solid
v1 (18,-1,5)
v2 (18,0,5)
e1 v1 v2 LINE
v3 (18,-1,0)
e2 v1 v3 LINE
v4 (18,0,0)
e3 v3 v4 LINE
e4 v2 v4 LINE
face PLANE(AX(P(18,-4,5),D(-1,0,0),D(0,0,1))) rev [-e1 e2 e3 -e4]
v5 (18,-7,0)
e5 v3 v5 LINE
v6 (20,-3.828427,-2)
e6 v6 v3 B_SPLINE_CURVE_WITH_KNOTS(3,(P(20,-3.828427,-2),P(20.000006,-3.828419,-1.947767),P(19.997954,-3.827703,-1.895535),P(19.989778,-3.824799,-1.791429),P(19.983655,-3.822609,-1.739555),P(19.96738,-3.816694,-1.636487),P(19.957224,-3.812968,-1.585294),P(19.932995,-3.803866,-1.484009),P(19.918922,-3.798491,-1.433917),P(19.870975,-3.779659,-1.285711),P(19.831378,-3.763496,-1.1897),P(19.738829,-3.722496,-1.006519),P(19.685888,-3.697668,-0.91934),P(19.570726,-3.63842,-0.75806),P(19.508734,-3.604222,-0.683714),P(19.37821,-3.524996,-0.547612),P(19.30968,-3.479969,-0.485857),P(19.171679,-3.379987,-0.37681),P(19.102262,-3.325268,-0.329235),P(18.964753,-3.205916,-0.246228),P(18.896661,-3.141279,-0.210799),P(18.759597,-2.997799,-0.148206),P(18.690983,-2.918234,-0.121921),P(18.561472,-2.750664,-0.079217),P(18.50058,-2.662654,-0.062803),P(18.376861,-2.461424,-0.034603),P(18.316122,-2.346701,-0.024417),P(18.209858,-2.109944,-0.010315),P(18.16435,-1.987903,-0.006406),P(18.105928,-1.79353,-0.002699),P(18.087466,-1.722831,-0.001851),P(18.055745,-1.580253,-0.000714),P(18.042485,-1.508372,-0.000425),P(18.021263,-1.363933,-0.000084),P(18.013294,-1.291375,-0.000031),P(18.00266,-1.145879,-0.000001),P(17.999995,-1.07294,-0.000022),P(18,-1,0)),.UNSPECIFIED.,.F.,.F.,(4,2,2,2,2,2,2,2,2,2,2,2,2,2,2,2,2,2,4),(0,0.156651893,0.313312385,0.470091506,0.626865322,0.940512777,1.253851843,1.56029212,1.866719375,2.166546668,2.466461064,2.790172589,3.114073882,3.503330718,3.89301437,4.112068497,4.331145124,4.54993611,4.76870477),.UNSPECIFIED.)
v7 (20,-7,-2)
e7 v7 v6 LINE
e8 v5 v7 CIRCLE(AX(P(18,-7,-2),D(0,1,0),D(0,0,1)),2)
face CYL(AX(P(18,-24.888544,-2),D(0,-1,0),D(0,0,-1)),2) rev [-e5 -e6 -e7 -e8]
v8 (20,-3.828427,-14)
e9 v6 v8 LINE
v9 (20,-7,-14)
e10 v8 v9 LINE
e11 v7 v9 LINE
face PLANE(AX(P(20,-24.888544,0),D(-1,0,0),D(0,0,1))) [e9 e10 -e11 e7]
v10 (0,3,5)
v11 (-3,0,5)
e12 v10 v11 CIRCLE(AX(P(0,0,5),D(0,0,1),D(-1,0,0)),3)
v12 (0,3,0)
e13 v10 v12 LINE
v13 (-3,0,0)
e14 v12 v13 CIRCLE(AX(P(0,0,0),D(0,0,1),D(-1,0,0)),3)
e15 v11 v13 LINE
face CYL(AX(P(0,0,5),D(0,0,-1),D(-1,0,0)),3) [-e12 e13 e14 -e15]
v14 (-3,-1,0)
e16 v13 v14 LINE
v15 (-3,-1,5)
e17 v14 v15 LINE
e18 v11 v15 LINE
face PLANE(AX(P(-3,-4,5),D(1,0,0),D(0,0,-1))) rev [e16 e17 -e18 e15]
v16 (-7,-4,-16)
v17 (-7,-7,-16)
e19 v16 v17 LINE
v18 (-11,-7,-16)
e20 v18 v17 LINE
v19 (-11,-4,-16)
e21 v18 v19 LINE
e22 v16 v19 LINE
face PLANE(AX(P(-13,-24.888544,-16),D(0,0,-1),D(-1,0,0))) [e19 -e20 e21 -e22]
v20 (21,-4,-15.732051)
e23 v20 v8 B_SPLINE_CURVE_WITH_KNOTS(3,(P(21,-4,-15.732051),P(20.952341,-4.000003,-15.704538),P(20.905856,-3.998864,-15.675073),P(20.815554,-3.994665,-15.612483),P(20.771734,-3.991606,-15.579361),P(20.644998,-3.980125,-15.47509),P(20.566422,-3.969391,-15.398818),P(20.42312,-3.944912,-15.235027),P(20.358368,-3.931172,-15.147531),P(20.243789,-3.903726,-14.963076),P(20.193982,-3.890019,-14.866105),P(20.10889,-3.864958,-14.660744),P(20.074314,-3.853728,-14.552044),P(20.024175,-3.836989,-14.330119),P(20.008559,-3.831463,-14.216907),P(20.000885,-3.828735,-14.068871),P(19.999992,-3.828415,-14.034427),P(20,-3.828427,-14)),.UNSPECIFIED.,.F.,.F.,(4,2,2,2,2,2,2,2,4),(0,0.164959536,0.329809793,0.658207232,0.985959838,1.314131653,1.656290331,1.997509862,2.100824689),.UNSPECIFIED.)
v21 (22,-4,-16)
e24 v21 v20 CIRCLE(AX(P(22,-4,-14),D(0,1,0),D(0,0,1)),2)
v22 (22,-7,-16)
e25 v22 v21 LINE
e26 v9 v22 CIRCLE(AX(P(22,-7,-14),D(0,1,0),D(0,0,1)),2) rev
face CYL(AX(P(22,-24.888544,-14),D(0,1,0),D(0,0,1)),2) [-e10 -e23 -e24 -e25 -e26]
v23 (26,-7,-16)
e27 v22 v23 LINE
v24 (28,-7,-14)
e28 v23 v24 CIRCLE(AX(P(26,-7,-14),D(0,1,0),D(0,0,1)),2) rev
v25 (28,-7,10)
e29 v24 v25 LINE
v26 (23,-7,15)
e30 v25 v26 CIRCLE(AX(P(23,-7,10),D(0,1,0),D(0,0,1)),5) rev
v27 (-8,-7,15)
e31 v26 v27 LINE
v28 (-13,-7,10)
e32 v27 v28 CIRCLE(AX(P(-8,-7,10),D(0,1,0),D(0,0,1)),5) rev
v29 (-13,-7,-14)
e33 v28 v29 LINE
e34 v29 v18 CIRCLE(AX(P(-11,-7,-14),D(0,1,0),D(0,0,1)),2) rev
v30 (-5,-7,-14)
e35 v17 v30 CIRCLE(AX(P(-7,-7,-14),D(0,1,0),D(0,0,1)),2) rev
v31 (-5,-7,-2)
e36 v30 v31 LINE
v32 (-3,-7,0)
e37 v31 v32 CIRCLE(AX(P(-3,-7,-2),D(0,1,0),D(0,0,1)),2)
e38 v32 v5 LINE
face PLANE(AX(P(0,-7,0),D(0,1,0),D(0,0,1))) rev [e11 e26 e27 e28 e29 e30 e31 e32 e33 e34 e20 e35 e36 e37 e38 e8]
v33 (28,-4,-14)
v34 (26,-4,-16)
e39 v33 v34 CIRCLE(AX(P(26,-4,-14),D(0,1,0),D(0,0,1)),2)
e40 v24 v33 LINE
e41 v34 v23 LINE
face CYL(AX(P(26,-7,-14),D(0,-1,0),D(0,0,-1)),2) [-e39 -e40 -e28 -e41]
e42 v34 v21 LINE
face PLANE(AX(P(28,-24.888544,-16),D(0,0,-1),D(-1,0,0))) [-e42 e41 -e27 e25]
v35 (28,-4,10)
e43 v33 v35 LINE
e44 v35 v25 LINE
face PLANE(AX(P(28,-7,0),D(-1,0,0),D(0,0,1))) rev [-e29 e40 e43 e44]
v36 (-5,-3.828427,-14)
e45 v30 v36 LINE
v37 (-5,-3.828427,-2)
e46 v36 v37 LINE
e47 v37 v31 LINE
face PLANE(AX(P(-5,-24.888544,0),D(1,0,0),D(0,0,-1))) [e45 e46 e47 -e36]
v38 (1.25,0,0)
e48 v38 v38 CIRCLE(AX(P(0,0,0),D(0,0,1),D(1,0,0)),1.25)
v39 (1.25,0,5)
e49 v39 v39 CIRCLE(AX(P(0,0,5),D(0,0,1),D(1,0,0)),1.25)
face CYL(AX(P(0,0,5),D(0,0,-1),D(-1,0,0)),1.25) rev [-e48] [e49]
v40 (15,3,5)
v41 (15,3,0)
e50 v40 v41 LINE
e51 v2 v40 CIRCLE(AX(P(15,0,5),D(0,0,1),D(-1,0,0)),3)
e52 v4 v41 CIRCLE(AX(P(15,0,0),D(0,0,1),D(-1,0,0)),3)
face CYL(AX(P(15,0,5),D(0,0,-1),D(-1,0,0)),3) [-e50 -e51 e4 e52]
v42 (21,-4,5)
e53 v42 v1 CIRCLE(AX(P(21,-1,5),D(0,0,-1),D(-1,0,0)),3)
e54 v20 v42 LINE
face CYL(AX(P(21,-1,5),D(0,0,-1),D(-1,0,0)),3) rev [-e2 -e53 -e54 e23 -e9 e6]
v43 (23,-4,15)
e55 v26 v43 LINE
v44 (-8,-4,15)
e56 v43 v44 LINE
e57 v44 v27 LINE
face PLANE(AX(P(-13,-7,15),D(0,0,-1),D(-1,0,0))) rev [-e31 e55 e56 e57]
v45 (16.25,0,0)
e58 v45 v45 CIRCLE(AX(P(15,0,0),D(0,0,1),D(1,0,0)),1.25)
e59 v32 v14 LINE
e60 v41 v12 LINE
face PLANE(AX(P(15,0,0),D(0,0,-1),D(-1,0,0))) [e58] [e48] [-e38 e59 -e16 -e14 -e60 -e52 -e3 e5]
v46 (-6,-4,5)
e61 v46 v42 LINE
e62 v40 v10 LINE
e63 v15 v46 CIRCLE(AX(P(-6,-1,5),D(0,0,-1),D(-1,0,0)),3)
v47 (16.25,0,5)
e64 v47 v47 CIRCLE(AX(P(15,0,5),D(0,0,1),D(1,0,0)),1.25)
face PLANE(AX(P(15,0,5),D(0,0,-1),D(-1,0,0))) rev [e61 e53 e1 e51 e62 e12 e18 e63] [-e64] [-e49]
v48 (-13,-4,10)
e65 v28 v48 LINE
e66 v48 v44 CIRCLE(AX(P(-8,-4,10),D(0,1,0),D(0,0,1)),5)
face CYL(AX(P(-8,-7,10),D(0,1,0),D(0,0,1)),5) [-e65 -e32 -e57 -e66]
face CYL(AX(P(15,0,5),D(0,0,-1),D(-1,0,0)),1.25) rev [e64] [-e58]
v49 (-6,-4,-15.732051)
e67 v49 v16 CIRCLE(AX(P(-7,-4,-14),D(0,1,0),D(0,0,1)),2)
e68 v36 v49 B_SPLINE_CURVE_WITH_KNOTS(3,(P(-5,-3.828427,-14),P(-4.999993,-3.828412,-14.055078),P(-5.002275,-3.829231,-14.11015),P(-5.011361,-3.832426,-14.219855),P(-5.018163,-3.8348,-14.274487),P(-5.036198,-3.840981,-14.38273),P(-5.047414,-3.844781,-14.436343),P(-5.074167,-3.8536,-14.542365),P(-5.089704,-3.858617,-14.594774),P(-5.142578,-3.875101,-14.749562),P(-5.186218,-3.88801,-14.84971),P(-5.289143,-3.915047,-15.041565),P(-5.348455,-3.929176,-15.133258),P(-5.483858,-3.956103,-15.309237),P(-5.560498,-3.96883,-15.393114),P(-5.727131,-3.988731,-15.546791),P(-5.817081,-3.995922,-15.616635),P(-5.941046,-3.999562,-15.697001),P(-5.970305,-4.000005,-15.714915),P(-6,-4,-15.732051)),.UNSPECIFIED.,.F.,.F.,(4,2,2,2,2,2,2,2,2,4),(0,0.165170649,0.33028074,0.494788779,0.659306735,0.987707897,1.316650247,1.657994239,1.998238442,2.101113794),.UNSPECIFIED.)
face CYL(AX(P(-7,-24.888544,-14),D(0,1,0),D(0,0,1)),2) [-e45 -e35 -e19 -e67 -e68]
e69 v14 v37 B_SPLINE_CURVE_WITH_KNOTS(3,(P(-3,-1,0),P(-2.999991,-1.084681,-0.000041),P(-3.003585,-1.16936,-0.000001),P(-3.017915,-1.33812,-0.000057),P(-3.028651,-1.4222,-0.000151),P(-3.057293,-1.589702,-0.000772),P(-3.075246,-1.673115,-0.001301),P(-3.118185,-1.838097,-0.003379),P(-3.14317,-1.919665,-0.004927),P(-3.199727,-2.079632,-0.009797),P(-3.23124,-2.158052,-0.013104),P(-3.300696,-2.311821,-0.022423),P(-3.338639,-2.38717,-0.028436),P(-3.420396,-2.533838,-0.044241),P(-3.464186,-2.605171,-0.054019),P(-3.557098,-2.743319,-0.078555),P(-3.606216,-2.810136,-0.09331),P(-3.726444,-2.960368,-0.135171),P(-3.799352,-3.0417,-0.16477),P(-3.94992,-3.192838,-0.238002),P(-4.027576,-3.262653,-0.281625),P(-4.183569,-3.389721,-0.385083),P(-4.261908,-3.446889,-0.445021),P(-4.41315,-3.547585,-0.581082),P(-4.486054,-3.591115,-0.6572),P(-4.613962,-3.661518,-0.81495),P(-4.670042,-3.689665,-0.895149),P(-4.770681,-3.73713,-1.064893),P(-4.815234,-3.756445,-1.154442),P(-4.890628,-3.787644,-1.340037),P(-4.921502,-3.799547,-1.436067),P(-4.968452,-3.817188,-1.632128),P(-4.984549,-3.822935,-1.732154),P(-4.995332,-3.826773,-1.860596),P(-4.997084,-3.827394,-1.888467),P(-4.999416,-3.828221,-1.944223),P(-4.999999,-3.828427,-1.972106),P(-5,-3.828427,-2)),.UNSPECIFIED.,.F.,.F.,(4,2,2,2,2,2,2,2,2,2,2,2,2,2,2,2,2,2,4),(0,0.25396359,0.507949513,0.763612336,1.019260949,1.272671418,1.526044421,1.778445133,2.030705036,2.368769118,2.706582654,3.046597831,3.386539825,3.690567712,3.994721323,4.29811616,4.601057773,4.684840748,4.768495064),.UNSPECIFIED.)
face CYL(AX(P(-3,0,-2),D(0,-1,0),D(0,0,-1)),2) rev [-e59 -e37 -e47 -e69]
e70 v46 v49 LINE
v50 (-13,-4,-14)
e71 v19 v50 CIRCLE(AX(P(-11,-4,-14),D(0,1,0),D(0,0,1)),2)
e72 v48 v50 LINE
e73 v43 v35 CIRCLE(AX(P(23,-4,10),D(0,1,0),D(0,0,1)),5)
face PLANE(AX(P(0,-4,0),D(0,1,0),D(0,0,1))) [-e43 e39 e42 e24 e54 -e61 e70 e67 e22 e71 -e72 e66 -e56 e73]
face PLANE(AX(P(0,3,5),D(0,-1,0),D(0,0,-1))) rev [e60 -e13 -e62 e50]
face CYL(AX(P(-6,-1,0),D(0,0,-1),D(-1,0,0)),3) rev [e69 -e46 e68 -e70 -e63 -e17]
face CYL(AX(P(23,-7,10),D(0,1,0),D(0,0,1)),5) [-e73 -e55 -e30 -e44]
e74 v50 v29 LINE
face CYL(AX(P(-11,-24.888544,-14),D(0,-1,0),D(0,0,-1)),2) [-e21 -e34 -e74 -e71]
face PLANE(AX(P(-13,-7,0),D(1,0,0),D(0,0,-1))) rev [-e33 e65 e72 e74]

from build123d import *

# Parameters (mm, degrees)
SKETCH_1_R      = 1.25
EXTRUDE_1_DEPTH = 5
SKETCH_2_W      = 41
SKETCH_2_H      = 15
EXTRUDE_2_DEPTH = 3
SKETCH_4_W      = 8
SKETCH_4_H      = 16
EXTRUDE_3_DEPTH = 3
FILLET_1_R      = 3
FILLET_2_R      = 5
FILLET_3_R      = 2


with BuildPart() as part:
    # ｽｹｯﾁ1 → ﾎﾞｽ - 押し出し1 (new body)
    with BuildSketch(Plane.XY):
        with BuildLine():
            Line((-3, -4), (18, -4))
            Line((18, -4), (18, 0))
            ThreePointArc((18, 0), (17.121320344, 2.121320344), (15, 3))
            Line((15, 3), (0, 3))
            ThreePointArc((0, 3), (-2.121320344, 2.121320344), (-3, 0))
            Line((-3, 0), (-3, -4))
        make_face()
        Circle(SKETCH_1_R, mode=Mode.SUBTRACT)
        with Locations((15, 0)):
            Circle(SKETCH_1_R, mode=Mode.SUBTRACT)
    extrude(amount=EXTRUDE_1_DEPTH)

    # ｽｹｯﾁ2 → ﾎﾞｽ - 押し出し2 (add)
    with BuildSketch(Plane.XZ.offset(4)):
        with Locations((7.5, 7.5)):
            Rectangle(SKETCH_2_W, SKETCH_2_H)
    extrude(amount=EXTRUDE_2_DEPTH)

    # ｽｹｯﾁ4 → ﾎﾞｽ - 押し出し3 (add)
    with BuildSketch(Plane(origin=(0, -4, 0), x_dir=(1, 0, 0), z_dir=(0, 1, 0))):
        with Locations((-9, 8)):
            Rectangle(SKETCH_4_W, SKETCH_4_H)
        with Locations((24, 8)):
            Rectangle(SKETCH_4_W, SKETCH_4_H)
    extrude(amount=-EXTRUDE_3_DEPTH)

    # ﾌｨﾚｯﾄ1
    fillet_1_edges = [part.edges().sort_by_distance(p)[0] for p in [
        (-3, -4, 2.5),
        (18, -4, 2.5),
    ]]
    fillet(fillet_1_edges, radius=FILLET_1_R)

    # ﾌｨﾚｯﾄ2
    fillet_2_edges = [part.edges().sort_by_distance(p)[0] for p in [
        (-13, -5.5, 15),
        (28, -5.5, 15),
    ]]
    fillet(fillet_2_edges, radius=FILLET_2_R)

    # ﾌｨﾚｯﾄ3
    fillet_3_edges = [part.edges().sort_by_distance(p)[0] for p in [
        (28, -5.5, -16),
        (20, -5.414213562, -16),
        (20, -5.414213562, 0),
        (-5, -5.414213562, 0),
        (-5, -5.414213562, -16),
        (-13, -5.5, -16),
    ]]
    fillet(fillet_3_edges, radius=FILLET_3_R - 0.0001)  # a hair under: the kernel refuses the full size


solid = part.part
